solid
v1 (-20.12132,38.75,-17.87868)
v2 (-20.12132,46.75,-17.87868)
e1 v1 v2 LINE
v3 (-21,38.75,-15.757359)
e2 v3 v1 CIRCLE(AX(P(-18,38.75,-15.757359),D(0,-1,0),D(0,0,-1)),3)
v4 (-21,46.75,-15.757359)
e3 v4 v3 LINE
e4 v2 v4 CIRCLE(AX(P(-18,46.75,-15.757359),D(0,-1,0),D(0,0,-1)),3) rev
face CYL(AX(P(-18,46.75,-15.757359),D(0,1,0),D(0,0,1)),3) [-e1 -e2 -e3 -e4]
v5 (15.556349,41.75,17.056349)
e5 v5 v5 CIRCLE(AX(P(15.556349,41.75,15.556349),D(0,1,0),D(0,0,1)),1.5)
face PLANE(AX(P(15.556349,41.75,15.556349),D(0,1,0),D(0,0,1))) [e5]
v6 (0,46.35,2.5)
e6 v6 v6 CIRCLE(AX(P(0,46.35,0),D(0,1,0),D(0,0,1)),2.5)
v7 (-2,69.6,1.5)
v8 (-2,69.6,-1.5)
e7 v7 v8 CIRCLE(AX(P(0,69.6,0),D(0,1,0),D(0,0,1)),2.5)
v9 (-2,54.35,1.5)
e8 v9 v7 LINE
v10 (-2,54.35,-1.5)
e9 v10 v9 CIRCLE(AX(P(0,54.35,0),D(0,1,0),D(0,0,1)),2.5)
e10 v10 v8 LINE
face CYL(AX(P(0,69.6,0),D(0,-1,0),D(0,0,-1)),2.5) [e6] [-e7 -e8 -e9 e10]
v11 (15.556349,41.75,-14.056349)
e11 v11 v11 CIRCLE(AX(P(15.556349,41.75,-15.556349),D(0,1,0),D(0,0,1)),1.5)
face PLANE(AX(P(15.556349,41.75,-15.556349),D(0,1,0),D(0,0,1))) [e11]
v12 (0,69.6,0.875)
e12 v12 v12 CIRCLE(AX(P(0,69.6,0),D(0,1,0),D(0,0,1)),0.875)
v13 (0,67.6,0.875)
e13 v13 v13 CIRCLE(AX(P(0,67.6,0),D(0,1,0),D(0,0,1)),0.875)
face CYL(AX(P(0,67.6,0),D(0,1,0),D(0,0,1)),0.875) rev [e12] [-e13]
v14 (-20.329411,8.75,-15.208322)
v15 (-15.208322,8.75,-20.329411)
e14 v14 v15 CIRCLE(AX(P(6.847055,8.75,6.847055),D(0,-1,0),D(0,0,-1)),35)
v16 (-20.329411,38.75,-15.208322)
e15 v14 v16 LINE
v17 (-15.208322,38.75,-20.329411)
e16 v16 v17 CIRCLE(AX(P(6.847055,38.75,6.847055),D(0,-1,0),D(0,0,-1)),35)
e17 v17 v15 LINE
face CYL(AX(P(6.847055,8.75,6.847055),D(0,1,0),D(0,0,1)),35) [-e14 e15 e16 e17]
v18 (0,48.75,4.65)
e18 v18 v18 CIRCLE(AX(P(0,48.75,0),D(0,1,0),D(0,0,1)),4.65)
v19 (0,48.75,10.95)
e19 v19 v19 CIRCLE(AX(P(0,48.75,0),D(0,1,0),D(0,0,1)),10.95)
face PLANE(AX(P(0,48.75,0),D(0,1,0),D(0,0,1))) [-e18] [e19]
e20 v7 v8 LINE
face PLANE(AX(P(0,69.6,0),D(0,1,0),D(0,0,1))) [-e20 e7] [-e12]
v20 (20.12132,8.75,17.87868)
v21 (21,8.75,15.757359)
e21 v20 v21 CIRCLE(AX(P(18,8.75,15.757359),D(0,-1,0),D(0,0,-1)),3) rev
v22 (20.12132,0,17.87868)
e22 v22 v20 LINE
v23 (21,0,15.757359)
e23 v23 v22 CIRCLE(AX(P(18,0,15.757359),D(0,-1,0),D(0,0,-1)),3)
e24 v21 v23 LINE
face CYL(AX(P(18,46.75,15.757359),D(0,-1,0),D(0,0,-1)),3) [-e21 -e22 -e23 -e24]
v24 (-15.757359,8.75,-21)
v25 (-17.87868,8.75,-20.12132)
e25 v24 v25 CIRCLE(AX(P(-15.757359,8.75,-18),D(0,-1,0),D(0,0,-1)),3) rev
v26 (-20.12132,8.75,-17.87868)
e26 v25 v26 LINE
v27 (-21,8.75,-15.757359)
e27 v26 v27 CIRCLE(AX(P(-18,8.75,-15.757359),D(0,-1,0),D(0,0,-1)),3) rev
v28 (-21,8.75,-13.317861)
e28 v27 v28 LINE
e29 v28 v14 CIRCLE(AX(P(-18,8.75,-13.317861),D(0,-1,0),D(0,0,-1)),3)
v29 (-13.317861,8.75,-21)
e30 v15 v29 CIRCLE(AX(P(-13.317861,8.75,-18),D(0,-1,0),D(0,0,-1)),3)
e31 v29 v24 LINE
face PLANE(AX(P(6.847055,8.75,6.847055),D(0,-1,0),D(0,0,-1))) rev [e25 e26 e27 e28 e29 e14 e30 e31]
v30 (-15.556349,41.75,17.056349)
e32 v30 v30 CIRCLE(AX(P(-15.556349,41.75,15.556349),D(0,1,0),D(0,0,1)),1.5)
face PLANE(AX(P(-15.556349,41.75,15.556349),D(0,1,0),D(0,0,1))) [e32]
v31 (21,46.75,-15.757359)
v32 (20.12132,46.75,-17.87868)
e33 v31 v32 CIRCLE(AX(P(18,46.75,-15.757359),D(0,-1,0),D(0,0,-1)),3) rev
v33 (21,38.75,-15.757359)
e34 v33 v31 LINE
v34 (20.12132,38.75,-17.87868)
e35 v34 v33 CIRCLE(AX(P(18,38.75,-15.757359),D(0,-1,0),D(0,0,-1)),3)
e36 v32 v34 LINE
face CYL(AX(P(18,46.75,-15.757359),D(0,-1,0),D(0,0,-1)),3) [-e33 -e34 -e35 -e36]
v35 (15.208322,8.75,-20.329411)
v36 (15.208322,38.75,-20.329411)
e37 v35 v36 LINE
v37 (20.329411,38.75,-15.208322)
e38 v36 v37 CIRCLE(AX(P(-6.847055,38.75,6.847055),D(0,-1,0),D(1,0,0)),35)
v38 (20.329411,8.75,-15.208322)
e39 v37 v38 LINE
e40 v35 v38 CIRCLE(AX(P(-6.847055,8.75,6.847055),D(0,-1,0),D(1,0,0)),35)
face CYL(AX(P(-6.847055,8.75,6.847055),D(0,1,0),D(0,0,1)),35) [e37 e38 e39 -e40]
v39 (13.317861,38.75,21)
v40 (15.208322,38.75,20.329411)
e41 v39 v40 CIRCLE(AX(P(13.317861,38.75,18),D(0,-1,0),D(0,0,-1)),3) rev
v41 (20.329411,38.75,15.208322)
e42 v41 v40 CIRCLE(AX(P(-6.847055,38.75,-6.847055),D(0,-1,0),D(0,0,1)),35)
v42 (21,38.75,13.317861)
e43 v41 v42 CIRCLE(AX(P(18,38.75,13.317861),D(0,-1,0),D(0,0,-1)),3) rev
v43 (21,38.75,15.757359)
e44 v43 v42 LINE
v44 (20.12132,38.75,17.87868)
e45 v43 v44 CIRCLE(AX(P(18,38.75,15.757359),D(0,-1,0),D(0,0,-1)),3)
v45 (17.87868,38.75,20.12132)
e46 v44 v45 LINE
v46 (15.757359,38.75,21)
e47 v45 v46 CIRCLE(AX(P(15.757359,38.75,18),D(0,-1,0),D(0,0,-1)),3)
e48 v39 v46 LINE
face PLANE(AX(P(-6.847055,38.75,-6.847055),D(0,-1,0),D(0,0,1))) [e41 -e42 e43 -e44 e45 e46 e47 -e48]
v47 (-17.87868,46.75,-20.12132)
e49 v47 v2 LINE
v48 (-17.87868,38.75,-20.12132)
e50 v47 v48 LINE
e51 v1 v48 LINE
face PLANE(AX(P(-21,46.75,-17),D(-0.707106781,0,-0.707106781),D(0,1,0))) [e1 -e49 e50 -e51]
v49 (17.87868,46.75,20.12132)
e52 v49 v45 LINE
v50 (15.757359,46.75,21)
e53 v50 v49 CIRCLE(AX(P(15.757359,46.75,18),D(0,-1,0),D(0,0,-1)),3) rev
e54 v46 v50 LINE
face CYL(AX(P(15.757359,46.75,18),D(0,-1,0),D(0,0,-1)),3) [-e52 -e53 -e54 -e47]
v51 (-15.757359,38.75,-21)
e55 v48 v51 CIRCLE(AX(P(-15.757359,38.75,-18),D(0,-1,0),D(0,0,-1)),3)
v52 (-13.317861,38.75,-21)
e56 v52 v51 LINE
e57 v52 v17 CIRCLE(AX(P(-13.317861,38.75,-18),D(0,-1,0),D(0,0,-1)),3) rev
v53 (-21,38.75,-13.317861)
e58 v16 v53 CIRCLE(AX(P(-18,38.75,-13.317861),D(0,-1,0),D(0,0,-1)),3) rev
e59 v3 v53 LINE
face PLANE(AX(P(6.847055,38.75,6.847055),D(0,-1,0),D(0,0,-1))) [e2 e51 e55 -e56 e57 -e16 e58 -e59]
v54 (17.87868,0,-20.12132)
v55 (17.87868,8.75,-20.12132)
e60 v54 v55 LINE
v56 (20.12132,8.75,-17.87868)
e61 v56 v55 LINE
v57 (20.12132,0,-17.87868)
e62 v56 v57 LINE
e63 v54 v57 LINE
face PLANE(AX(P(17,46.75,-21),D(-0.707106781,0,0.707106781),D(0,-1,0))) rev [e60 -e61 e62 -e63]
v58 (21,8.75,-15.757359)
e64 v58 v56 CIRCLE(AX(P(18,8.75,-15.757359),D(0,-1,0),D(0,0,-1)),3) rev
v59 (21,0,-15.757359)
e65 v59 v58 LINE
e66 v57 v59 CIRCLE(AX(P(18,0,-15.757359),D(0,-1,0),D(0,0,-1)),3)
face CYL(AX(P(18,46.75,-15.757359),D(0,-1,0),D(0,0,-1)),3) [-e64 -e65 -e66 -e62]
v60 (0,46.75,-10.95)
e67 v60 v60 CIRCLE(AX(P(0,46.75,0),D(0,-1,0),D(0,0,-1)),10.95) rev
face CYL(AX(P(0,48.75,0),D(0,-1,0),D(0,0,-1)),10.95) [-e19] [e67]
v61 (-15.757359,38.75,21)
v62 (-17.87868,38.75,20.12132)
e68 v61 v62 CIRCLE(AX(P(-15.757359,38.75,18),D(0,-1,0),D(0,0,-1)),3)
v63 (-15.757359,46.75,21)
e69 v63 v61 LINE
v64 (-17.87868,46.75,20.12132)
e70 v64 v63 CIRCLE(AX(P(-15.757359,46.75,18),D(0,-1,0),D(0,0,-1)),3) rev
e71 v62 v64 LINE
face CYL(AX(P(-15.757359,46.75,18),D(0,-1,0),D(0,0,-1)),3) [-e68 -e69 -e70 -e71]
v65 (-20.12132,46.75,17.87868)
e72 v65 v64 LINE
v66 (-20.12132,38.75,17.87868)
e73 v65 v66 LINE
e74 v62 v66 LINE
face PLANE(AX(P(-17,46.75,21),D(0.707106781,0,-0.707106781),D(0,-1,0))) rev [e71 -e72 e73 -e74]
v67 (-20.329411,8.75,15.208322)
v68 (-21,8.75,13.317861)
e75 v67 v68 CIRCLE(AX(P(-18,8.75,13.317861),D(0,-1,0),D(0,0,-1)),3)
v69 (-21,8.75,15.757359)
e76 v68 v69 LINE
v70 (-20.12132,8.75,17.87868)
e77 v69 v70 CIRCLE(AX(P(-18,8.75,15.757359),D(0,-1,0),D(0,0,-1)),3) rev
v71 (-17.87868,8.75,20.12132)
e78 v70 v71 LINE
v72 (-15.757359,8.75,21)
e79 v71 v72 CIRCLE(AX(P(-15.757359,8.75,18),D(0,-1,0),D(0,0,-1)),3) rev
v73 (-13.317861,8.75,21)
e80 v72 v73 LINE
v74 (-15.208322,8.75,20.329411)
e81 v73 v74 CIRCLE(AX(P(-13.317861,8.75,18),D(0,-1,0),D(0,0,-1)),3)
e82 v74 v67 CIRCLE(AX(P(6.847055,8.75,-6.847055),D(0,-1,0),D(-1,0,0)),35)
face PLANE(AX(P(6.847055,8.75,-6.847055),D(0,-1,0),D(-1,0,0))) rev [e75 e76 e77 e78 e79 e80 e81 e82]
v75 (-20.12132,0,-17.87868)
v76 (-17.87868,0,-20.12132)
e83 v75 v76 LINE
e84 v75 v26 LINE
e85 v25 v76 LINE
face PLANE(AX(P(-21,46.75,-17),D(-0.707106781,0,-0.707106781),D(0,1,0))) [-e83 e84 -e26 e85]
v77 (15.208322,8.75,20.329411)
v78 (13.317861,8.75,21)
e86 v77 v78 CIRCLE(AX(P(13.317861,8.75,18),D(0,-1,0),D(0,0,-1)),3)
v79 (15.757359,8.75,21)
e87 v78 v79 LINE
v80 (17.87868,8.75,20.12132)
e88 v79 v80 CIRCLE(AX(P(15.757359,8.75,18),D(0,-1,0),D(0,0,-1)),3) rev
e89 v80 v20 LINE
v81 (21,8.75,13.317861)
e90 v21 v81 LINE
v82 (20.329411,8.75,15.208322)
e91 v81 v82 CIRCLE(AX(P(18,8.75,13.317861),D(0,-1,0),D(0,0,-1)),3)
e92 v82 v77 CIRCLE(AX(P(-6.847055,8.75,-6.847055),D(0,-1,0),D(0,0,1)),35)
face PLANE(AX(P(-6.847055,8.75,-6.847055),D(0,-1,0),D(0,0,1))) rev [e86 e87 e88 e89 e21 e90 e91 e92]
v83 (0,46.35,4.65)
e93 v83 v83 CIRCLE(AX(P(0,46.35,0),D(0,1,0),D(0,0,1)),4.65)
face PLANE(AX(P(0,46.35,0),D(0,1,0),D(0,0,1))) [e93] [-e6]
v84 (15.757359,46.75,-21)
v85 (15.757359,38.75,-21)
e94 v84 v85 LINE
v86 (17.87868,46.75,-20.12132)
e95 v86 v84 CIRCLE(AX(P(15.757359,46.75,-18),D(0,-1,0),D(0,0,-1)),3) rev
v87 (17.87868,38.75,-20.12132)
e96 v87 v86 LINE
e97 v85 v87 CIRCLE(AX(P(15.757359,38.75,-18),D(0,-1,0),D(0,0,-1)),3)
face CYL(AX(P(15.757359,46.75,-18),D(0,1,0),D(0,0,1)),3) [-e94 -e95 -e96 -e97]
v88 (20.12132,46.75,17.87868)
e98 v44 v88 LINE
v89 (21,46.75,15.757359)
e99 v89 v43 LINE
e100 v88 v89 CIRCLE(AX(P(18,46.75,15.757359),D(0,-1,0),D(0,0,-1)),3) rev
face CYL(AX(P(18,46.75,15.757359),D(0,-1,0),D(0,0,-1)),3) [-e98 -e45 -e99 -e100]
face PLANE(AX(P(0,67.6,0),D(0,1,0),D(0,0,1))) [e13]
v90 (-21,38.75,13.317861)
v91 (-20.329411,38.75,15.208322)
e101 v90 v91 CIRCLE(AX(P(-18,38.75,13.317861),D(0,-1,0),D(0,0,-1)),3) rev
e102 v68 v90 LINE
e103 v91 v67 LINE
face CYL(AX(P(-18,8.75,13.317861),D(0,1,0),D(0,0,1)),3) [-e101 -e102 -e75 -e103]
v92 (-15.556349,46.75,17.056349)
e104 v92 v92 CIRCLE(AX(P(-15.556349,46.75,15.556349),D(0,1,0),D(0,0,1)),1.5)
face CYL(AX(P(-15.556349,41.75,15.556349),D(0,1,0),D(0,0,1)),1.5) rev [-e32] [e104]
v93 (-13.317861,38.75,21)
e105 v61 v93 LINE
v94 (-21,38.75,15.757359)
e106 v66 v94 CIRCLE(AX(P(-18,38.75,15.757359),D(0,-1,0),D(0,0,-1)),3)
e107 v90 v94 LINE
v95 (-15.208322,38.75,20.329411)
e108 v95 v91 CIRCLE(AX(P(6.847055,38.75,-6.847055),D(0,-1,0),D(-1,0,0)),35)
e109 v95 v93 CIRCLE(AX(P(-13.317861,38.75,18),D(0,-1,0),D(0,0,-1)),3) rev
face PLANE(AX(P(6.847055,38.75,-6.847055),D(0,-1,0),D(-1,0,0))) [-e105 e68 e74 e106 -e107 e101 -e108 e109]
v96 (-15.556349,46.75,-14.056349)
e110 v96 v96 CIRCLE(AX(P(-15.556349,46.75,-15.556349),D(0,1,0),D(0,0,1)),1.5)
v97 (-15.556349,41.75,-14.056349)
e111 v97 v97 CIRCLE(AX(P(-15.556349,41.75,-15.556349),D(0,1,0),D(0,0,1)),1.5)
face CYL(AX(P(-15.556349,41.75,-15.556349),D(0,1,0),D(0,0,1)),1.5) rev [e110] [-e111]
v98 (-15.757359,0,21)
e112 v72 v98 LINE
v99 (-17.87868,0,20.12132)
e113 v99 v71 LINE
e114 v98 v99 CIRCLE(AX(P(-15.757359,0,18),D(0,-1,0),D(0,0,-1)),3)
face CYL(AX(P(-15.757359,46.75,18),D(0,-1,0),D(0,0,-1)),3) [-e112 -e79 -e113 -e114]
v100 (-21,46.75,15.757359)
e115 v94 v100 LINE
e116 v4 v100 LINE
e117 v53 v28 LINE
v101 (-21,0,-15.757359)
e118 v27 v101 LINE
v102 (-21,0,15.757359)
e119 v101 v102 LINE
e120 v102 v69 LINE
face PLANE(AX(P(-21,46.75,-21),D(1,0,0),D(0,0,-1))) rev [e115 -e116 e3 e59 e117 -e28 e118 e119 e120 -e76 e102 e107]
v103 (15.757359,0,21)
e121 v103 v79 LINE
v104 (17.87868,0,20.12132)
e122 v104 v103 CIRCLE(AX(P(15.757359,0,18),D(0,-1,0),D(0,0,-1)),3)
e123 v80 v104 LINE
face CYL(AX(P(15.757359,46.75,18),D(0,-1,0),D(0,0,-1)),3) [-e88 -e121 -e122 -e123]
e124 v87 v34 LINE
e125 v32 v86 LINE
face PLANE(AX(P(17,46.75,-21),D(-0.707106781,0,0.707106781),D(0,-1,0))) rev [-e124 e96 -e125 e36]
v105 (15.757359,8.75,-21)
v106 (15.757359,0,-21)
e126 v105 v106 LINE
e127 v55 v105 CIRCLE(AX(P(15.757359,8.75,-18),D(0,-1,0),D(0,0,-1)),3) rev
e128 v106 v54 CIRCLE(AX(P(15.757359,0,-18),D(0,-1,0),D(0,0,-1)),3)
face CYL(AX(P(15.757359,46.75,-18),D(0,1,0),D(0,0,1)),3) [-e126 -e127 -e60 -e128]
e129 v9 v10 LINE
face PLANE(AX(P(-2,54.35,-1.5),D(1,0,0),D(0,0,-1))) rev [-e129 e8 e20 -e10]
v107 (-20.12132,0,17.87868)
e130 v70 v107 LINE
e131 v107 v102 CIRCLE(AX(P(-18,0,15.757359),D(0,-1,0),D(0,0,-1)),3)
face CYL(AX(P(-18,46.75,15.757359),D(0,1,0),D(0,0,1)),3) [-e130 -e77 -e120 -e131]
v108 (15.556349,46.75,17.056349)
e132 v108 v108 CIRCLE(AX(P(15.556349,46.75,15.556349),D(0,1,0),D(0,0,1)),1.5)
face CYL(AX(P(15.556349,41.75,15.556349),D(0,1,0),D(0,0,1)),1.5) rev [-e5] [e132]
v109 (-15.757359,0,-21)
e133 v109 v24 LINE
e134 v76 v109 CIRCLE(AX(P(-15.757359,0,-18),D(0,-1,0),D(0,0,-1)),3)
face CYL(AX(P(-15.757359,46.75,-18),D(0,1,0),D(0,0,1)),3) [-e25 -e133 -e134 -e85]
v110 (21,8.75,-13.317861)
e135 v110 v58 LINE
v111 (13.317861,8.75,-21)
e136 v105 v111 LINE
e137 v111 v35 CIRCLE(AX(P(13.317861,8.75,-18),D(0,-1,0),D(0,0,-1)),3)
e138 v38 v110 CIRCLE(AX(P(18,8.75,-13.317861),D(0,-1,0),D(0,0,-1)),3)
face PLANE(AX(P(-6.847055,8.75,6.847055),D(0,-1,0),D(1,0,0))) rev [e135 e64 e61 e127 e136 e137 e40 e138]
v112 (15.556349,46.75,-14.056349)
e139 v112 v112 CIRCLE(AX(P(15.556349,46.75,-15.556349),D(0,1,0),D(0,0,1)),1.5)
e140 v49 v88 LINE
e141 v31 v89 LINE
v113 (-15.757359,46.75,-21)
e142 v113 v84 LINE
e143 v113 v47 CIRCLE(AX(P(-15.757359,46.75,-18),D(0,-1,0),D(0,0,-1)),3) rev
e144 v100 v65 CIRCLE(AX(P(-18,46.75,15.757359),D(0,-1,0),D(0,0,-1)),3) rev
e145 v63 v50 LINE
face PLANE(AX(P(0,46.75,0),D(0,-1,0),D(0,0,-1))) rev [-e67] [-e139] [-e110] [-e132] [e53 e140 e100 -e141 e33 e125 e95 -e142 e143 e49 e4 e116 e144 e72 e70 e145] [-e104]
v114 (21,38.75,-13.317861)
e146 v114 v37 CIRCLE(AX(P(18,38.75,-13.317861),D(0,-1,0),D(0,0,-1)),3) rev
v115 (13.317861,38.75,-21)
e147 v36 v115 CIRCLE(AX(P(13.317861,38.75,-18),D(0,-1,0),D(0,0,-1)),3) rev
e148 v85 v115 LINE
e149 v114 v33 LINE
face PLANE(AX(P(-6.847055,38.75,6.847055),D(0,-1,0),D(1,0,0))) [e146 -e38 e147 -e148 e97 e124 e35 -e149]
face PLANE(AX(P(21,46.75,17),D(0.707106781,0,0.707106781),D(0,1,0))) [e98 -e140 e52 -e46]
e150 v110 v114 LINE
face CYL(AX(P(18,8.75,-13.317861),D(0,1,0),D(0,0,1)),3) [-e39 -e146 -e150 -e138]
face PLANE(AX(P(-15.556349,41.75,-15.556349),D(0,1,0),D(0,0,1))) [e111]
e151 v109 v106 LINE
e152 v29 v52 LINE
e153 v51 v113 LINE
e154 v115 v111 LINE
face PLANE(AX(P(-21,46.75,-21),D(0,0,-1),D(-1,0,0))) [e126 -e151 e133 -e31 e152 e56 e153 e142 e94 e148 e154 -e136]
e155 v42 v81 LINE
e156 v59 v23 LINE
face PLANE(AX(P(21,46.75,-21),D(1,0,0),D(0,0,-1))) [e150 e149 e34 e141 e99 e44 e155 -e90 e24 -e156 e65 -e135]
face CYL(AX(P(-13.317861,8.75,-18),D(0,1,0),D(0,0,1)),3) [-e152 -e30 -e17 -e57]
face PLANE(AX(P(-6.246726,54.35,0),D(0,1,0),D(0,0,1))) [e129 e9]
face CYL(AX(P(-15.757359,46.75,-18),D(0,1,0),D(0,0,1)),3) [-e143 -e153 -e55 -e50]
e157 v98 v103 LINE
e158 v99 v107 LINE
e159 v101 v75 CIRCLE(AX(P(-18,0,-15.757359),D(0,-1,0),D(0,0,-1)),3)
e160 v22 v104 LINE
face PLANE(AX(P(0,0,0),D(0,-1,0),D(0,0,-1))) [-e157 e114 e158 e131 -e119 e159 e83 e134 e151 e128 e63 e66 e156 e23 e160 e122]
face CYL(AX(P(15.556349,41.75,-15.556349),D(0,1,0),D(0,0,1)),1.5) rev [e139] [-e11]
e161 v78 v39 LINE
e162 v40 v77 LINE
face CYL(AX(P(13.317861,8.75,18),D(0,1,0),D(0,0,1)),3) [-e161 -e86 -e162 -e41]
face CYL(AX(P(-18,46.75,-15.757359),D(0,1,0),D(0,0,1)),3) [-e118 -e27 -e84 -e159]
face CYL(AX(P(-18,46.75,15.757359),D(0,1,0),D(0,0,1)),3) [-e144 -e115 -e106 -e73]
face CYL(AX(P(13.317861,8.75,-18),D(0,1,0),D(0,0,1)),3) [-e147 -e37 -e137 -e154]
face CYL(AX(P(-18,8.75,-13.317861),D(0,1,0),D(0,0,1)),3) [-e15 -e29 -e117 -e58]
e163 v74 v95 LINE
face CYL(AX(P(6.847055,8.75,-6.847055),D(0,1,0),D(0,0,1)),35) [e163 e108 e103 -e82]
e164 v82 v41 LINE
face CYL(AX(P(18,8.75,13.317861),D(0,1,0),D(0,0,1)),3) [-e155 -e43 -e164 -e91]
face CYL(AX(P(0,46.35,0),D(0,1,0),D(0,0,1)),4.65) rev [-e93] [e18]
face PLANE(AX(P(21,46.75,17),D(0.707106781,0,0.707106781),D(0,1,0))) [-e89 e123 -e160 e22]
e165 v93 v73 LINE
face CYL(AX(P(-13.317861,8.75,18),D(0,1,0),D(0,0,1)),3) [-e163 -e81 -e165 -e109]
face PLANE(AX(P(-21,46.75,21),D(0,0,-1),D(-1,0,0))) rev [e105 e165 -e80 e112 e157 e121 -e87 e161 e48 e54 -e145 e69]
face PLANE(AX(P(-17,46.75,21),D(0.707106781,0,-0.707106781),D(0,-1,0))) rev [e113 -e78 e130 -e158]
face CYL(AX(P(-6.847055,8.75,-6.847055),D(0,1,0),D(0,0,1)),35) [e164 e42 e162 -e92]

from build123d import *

# Parameters (mm, degrees)
SKETCH1_W             = 42
SKETCH1_H             = 42
SKETCH1_R             = 3.407851421
BOSS_EXTRUDE1_DEPTH   = 46.75
SKETCH2_R             = 10.95
BOSS_EXTRUDE2_DEPTH   = 2
CUT_EXTRUDE1_START    = -8
CUT_EXTRUDE1_DEPTH    = 30
CIRPATTERN1_COUNT     = 4
FILLET1_R             = 3
CHAMFER1_SIZE         = 4
FILLET2_R             = 3
SKETCH4_R             = 4.65
CUT_EXTRUDE2_DEPTH    = 2.4
DELETEFACE1_OUTLINE_R = 3.407851421
DELETEFACE1_DEPTH     = 46.35
SKETCH5_R             = 2.5
BOSS_EXTRUDE3_DEPTH   = 23.25
CUT_EXTRUDE3_DEPTH    = 15.25
SKETCH7_R             = 0.875
CUT_EXTRUDE4_DEPTH    = 2
SKETCH8_R             = 1.5
CUT_EXTRUDE5_DEPTH    = 5


# Read off the part's stored shape, not the designer's step: DeleteFace1
with BuildPart() as part:
    # Sketch1 → Boss-Extrude1 (new body)
    with BuildSketch(Plane(origin=(0, 0, 0), x_dir=(1, 0, 0), z_dir=(0, 1, 0))):
        Rectangle(SKETCH1_W, SKETCH1_H)
        with Locations(Location((0, 0, 0), (0, 0, 270))):
            Circle(SKETCH1_R, mode=Mode.SUBTRACT)
    extrude(amount=BOSS_EXTRUDE1_DEPTH)

    # Sketch2 → Boss-Extrude2 (add)
    with BuildSketch(Plane(origin=(0, 46.75, 0), x_dir=(1, 0, 0), z_dir=(0, 1, 0))):
        with Locations(Location((0, 0, 0), (0, 0, 90))):
            Circle(SKETCH2_R)
    extrude(amount=BOSS_EXTRUDE2_DEPTH)

    # Sketch3 → Cut-Extrude1 (cut)
    with BuildSketch(Plane(origin=(0, 46.75, 0), x_dir=(1, 0, 0), z_dir=(0, 1, 0)).offset(CUT_EXTRUDE1_START)):
        with BuildLine():
            Line((-14.355339059, 21), (-21, 21))
            Line((-21, 21), (-21, 14.355339059))
            ThreePointArc((-21, 14.355339059), (-17.901682199, 17.901682199), (-14.355339059, 21))
        make_face()
    cut_extrude1 = extrude(amount=-CUT_EXTRUDE1_DEPTH, mode=Mode.SUBTRACT)

    # CirPattern1: Cut-Extrude1 ×4 about axis
    cirpattern1_axis = Axis((0, 0, 0), (0, 1, 0))
    for i in range(1, CIRPATTERN1_COUNT):
        add(cut_extrude1.rotate(cirpattern1_axis, i * 360 / CIRPATTERN1_COUNT), mode=Mode.SUBTRACT)

    # Fillet1
    fillet1_edges = [part.edges().sort_by_distance(p)[0] for p in [
        (-14.355339059, 23.75, -21),
        (-21, 23.75, -14.355339059),
        (21, 23.75, -14.355339059),
        (14.355339059, 23.75, -21),
        (14.355339059, 23.75, 21),
        (21, 23.75, 14.355339059),
        (-21, 23.75, 14.355339059),
        (-14.355339059, 23.75, 21),
    ]]
    fillet(fillet1_edges, radius=FILLET1_R)

    # Chamfer1
    chamfer1_edges = [part.edges().sort_by_distance(p)[0] for p in [
        (-21, 4.375, -21),
        (21, 4.375, -21),
        (21, 4.375, 21),
        (-21, 4.375, 21),
        (-21, 42.75, -21),
        (-21, 42.75, 21),
        (21, 42.75, 21),
        (21, 42.75, -21),
    ]]
    chamfer(chamfer1_edges, length=CHAMFER1_SIZE)

    # Fillet2
    fillet2_edges = [part.edges().sort_by_distance(p)[0] for p in [
        (17, 42.75, 21),
        (17, 4.375, 21),
        (-17, 4.375, 21),
        (-17, 42.75, 21),
        (-21, 42.75, -17),
        (-21, 4.375, -17),
        (-21, 4.375, 17),
        (-21, 42.75, 17),
        (17, 42.75, -21),
        (17, 4.375, -21),
        (-17, 42.75, -21),
        (-17, 4.375, -21),
        (21, 42.75, -17),
        (21, 4.375, -17),
        (21, 42.75, 17),
        (21, 4.375, 17),
    ]]
    fillet(fillet2_edges, radius=FILLET2_R)

    # Sketch4 → Cut-Extrude2 (cut)
    with BuildSketch(Plane(origin=(0, 48.75, 0), x_dir=(1, 0, 0), z_dir=(0, 1, 0))):
        with Locations(Location((0, 0, 0), (0, 0, 270))):
            Circle(SKETCH4_R)
    extrude(amount=-CUT_EXTRUDE2_DEPTH, mode=Mode.SUBTRACT)

    # DeleteFace1 outline → DeleteFace1 (add)
    with BuildSketch(Plane(origin=(0, 0, 0), x_dir=(1, 0, 0), z_dir=(0, 1, 0))):
        Circle(DELETEFACE1_OUTLINE_R)
    extrude(amount=DELETEFACE1_DEPTH)

    # Sketch5 → Boss-Extrude3 (add)
    with BuildSketch(Plane(origin=(0, 46.35, 0), x_dir=(1, 0, 0), z_dir=(0, 1, 0))):
        with Locations(Location((0, 0, 0), (0, 0, 90))):
            Circle(SKETCH5_R)
    extrude(amount=BOSS_EXTRUDE3_DEPTH)

    # Sketch6 → Cut-Extrude3 (cut)
    with BuildSketch(Plane(origin=(0, 69.6, 0), x_dir=(1, 0, 0), z_dir=(0, 1, 0))):
        with BuildLine():
            Line((-2, 1.5), (-2, -1.5))
            ThreePointArc((-2, -1.5), (-10.750577437, 0), (-2, 1.5))
        make_face()
    extrude(amount=-CUT_EXTRUDE3_DEPTH, mode=Mode.SUBTRACT)

    # Sketch7 → Cut-Extrude4 (cut)
    with BuildSketch(Plane(origin=(0, 69.6, 0), x_dir=(1, 0, 0), z_dir=(0, 1, 0))):
        with Locations(Location((0, 0, 0), (0, 0, 270))):
            Circle(SKETCH7_R)
    extrude(amount=-CUT_EXTRUDE4_DEPTH, mode=Mode.SUBTRACT)

    # Sketch8 → Cut-Extrude5 (cut)
    with BuildSketch(Plane(origin=(0, 46.75, 0), x_dir=(1, 0, 0), z_dir=(0, 1, 0))):
        with Locations(Location((-15.556349186, 15.556349186, 0), (0, 0, 270))):
            Circle(SKETCH8_R)
        with Locations(Location((15.556349186, 15.556349186, 0), (0, 0, 270))):
            Circle(SKETCH8_R)
        with Locations(Location((15.556349186, -15.556349186, 0), (0, 0, 270))):
            Circle(SKETCH8_R)
        with Locations(Location((-15.556349186, -15.556349186, 0), (0, 0, 270))):
            Circle(SKETCH8_R)
    extrude(amount=-CUT_EXTRUDE5_DEPTH, mode=Mode.SUBTRACT)


solid = part.part
